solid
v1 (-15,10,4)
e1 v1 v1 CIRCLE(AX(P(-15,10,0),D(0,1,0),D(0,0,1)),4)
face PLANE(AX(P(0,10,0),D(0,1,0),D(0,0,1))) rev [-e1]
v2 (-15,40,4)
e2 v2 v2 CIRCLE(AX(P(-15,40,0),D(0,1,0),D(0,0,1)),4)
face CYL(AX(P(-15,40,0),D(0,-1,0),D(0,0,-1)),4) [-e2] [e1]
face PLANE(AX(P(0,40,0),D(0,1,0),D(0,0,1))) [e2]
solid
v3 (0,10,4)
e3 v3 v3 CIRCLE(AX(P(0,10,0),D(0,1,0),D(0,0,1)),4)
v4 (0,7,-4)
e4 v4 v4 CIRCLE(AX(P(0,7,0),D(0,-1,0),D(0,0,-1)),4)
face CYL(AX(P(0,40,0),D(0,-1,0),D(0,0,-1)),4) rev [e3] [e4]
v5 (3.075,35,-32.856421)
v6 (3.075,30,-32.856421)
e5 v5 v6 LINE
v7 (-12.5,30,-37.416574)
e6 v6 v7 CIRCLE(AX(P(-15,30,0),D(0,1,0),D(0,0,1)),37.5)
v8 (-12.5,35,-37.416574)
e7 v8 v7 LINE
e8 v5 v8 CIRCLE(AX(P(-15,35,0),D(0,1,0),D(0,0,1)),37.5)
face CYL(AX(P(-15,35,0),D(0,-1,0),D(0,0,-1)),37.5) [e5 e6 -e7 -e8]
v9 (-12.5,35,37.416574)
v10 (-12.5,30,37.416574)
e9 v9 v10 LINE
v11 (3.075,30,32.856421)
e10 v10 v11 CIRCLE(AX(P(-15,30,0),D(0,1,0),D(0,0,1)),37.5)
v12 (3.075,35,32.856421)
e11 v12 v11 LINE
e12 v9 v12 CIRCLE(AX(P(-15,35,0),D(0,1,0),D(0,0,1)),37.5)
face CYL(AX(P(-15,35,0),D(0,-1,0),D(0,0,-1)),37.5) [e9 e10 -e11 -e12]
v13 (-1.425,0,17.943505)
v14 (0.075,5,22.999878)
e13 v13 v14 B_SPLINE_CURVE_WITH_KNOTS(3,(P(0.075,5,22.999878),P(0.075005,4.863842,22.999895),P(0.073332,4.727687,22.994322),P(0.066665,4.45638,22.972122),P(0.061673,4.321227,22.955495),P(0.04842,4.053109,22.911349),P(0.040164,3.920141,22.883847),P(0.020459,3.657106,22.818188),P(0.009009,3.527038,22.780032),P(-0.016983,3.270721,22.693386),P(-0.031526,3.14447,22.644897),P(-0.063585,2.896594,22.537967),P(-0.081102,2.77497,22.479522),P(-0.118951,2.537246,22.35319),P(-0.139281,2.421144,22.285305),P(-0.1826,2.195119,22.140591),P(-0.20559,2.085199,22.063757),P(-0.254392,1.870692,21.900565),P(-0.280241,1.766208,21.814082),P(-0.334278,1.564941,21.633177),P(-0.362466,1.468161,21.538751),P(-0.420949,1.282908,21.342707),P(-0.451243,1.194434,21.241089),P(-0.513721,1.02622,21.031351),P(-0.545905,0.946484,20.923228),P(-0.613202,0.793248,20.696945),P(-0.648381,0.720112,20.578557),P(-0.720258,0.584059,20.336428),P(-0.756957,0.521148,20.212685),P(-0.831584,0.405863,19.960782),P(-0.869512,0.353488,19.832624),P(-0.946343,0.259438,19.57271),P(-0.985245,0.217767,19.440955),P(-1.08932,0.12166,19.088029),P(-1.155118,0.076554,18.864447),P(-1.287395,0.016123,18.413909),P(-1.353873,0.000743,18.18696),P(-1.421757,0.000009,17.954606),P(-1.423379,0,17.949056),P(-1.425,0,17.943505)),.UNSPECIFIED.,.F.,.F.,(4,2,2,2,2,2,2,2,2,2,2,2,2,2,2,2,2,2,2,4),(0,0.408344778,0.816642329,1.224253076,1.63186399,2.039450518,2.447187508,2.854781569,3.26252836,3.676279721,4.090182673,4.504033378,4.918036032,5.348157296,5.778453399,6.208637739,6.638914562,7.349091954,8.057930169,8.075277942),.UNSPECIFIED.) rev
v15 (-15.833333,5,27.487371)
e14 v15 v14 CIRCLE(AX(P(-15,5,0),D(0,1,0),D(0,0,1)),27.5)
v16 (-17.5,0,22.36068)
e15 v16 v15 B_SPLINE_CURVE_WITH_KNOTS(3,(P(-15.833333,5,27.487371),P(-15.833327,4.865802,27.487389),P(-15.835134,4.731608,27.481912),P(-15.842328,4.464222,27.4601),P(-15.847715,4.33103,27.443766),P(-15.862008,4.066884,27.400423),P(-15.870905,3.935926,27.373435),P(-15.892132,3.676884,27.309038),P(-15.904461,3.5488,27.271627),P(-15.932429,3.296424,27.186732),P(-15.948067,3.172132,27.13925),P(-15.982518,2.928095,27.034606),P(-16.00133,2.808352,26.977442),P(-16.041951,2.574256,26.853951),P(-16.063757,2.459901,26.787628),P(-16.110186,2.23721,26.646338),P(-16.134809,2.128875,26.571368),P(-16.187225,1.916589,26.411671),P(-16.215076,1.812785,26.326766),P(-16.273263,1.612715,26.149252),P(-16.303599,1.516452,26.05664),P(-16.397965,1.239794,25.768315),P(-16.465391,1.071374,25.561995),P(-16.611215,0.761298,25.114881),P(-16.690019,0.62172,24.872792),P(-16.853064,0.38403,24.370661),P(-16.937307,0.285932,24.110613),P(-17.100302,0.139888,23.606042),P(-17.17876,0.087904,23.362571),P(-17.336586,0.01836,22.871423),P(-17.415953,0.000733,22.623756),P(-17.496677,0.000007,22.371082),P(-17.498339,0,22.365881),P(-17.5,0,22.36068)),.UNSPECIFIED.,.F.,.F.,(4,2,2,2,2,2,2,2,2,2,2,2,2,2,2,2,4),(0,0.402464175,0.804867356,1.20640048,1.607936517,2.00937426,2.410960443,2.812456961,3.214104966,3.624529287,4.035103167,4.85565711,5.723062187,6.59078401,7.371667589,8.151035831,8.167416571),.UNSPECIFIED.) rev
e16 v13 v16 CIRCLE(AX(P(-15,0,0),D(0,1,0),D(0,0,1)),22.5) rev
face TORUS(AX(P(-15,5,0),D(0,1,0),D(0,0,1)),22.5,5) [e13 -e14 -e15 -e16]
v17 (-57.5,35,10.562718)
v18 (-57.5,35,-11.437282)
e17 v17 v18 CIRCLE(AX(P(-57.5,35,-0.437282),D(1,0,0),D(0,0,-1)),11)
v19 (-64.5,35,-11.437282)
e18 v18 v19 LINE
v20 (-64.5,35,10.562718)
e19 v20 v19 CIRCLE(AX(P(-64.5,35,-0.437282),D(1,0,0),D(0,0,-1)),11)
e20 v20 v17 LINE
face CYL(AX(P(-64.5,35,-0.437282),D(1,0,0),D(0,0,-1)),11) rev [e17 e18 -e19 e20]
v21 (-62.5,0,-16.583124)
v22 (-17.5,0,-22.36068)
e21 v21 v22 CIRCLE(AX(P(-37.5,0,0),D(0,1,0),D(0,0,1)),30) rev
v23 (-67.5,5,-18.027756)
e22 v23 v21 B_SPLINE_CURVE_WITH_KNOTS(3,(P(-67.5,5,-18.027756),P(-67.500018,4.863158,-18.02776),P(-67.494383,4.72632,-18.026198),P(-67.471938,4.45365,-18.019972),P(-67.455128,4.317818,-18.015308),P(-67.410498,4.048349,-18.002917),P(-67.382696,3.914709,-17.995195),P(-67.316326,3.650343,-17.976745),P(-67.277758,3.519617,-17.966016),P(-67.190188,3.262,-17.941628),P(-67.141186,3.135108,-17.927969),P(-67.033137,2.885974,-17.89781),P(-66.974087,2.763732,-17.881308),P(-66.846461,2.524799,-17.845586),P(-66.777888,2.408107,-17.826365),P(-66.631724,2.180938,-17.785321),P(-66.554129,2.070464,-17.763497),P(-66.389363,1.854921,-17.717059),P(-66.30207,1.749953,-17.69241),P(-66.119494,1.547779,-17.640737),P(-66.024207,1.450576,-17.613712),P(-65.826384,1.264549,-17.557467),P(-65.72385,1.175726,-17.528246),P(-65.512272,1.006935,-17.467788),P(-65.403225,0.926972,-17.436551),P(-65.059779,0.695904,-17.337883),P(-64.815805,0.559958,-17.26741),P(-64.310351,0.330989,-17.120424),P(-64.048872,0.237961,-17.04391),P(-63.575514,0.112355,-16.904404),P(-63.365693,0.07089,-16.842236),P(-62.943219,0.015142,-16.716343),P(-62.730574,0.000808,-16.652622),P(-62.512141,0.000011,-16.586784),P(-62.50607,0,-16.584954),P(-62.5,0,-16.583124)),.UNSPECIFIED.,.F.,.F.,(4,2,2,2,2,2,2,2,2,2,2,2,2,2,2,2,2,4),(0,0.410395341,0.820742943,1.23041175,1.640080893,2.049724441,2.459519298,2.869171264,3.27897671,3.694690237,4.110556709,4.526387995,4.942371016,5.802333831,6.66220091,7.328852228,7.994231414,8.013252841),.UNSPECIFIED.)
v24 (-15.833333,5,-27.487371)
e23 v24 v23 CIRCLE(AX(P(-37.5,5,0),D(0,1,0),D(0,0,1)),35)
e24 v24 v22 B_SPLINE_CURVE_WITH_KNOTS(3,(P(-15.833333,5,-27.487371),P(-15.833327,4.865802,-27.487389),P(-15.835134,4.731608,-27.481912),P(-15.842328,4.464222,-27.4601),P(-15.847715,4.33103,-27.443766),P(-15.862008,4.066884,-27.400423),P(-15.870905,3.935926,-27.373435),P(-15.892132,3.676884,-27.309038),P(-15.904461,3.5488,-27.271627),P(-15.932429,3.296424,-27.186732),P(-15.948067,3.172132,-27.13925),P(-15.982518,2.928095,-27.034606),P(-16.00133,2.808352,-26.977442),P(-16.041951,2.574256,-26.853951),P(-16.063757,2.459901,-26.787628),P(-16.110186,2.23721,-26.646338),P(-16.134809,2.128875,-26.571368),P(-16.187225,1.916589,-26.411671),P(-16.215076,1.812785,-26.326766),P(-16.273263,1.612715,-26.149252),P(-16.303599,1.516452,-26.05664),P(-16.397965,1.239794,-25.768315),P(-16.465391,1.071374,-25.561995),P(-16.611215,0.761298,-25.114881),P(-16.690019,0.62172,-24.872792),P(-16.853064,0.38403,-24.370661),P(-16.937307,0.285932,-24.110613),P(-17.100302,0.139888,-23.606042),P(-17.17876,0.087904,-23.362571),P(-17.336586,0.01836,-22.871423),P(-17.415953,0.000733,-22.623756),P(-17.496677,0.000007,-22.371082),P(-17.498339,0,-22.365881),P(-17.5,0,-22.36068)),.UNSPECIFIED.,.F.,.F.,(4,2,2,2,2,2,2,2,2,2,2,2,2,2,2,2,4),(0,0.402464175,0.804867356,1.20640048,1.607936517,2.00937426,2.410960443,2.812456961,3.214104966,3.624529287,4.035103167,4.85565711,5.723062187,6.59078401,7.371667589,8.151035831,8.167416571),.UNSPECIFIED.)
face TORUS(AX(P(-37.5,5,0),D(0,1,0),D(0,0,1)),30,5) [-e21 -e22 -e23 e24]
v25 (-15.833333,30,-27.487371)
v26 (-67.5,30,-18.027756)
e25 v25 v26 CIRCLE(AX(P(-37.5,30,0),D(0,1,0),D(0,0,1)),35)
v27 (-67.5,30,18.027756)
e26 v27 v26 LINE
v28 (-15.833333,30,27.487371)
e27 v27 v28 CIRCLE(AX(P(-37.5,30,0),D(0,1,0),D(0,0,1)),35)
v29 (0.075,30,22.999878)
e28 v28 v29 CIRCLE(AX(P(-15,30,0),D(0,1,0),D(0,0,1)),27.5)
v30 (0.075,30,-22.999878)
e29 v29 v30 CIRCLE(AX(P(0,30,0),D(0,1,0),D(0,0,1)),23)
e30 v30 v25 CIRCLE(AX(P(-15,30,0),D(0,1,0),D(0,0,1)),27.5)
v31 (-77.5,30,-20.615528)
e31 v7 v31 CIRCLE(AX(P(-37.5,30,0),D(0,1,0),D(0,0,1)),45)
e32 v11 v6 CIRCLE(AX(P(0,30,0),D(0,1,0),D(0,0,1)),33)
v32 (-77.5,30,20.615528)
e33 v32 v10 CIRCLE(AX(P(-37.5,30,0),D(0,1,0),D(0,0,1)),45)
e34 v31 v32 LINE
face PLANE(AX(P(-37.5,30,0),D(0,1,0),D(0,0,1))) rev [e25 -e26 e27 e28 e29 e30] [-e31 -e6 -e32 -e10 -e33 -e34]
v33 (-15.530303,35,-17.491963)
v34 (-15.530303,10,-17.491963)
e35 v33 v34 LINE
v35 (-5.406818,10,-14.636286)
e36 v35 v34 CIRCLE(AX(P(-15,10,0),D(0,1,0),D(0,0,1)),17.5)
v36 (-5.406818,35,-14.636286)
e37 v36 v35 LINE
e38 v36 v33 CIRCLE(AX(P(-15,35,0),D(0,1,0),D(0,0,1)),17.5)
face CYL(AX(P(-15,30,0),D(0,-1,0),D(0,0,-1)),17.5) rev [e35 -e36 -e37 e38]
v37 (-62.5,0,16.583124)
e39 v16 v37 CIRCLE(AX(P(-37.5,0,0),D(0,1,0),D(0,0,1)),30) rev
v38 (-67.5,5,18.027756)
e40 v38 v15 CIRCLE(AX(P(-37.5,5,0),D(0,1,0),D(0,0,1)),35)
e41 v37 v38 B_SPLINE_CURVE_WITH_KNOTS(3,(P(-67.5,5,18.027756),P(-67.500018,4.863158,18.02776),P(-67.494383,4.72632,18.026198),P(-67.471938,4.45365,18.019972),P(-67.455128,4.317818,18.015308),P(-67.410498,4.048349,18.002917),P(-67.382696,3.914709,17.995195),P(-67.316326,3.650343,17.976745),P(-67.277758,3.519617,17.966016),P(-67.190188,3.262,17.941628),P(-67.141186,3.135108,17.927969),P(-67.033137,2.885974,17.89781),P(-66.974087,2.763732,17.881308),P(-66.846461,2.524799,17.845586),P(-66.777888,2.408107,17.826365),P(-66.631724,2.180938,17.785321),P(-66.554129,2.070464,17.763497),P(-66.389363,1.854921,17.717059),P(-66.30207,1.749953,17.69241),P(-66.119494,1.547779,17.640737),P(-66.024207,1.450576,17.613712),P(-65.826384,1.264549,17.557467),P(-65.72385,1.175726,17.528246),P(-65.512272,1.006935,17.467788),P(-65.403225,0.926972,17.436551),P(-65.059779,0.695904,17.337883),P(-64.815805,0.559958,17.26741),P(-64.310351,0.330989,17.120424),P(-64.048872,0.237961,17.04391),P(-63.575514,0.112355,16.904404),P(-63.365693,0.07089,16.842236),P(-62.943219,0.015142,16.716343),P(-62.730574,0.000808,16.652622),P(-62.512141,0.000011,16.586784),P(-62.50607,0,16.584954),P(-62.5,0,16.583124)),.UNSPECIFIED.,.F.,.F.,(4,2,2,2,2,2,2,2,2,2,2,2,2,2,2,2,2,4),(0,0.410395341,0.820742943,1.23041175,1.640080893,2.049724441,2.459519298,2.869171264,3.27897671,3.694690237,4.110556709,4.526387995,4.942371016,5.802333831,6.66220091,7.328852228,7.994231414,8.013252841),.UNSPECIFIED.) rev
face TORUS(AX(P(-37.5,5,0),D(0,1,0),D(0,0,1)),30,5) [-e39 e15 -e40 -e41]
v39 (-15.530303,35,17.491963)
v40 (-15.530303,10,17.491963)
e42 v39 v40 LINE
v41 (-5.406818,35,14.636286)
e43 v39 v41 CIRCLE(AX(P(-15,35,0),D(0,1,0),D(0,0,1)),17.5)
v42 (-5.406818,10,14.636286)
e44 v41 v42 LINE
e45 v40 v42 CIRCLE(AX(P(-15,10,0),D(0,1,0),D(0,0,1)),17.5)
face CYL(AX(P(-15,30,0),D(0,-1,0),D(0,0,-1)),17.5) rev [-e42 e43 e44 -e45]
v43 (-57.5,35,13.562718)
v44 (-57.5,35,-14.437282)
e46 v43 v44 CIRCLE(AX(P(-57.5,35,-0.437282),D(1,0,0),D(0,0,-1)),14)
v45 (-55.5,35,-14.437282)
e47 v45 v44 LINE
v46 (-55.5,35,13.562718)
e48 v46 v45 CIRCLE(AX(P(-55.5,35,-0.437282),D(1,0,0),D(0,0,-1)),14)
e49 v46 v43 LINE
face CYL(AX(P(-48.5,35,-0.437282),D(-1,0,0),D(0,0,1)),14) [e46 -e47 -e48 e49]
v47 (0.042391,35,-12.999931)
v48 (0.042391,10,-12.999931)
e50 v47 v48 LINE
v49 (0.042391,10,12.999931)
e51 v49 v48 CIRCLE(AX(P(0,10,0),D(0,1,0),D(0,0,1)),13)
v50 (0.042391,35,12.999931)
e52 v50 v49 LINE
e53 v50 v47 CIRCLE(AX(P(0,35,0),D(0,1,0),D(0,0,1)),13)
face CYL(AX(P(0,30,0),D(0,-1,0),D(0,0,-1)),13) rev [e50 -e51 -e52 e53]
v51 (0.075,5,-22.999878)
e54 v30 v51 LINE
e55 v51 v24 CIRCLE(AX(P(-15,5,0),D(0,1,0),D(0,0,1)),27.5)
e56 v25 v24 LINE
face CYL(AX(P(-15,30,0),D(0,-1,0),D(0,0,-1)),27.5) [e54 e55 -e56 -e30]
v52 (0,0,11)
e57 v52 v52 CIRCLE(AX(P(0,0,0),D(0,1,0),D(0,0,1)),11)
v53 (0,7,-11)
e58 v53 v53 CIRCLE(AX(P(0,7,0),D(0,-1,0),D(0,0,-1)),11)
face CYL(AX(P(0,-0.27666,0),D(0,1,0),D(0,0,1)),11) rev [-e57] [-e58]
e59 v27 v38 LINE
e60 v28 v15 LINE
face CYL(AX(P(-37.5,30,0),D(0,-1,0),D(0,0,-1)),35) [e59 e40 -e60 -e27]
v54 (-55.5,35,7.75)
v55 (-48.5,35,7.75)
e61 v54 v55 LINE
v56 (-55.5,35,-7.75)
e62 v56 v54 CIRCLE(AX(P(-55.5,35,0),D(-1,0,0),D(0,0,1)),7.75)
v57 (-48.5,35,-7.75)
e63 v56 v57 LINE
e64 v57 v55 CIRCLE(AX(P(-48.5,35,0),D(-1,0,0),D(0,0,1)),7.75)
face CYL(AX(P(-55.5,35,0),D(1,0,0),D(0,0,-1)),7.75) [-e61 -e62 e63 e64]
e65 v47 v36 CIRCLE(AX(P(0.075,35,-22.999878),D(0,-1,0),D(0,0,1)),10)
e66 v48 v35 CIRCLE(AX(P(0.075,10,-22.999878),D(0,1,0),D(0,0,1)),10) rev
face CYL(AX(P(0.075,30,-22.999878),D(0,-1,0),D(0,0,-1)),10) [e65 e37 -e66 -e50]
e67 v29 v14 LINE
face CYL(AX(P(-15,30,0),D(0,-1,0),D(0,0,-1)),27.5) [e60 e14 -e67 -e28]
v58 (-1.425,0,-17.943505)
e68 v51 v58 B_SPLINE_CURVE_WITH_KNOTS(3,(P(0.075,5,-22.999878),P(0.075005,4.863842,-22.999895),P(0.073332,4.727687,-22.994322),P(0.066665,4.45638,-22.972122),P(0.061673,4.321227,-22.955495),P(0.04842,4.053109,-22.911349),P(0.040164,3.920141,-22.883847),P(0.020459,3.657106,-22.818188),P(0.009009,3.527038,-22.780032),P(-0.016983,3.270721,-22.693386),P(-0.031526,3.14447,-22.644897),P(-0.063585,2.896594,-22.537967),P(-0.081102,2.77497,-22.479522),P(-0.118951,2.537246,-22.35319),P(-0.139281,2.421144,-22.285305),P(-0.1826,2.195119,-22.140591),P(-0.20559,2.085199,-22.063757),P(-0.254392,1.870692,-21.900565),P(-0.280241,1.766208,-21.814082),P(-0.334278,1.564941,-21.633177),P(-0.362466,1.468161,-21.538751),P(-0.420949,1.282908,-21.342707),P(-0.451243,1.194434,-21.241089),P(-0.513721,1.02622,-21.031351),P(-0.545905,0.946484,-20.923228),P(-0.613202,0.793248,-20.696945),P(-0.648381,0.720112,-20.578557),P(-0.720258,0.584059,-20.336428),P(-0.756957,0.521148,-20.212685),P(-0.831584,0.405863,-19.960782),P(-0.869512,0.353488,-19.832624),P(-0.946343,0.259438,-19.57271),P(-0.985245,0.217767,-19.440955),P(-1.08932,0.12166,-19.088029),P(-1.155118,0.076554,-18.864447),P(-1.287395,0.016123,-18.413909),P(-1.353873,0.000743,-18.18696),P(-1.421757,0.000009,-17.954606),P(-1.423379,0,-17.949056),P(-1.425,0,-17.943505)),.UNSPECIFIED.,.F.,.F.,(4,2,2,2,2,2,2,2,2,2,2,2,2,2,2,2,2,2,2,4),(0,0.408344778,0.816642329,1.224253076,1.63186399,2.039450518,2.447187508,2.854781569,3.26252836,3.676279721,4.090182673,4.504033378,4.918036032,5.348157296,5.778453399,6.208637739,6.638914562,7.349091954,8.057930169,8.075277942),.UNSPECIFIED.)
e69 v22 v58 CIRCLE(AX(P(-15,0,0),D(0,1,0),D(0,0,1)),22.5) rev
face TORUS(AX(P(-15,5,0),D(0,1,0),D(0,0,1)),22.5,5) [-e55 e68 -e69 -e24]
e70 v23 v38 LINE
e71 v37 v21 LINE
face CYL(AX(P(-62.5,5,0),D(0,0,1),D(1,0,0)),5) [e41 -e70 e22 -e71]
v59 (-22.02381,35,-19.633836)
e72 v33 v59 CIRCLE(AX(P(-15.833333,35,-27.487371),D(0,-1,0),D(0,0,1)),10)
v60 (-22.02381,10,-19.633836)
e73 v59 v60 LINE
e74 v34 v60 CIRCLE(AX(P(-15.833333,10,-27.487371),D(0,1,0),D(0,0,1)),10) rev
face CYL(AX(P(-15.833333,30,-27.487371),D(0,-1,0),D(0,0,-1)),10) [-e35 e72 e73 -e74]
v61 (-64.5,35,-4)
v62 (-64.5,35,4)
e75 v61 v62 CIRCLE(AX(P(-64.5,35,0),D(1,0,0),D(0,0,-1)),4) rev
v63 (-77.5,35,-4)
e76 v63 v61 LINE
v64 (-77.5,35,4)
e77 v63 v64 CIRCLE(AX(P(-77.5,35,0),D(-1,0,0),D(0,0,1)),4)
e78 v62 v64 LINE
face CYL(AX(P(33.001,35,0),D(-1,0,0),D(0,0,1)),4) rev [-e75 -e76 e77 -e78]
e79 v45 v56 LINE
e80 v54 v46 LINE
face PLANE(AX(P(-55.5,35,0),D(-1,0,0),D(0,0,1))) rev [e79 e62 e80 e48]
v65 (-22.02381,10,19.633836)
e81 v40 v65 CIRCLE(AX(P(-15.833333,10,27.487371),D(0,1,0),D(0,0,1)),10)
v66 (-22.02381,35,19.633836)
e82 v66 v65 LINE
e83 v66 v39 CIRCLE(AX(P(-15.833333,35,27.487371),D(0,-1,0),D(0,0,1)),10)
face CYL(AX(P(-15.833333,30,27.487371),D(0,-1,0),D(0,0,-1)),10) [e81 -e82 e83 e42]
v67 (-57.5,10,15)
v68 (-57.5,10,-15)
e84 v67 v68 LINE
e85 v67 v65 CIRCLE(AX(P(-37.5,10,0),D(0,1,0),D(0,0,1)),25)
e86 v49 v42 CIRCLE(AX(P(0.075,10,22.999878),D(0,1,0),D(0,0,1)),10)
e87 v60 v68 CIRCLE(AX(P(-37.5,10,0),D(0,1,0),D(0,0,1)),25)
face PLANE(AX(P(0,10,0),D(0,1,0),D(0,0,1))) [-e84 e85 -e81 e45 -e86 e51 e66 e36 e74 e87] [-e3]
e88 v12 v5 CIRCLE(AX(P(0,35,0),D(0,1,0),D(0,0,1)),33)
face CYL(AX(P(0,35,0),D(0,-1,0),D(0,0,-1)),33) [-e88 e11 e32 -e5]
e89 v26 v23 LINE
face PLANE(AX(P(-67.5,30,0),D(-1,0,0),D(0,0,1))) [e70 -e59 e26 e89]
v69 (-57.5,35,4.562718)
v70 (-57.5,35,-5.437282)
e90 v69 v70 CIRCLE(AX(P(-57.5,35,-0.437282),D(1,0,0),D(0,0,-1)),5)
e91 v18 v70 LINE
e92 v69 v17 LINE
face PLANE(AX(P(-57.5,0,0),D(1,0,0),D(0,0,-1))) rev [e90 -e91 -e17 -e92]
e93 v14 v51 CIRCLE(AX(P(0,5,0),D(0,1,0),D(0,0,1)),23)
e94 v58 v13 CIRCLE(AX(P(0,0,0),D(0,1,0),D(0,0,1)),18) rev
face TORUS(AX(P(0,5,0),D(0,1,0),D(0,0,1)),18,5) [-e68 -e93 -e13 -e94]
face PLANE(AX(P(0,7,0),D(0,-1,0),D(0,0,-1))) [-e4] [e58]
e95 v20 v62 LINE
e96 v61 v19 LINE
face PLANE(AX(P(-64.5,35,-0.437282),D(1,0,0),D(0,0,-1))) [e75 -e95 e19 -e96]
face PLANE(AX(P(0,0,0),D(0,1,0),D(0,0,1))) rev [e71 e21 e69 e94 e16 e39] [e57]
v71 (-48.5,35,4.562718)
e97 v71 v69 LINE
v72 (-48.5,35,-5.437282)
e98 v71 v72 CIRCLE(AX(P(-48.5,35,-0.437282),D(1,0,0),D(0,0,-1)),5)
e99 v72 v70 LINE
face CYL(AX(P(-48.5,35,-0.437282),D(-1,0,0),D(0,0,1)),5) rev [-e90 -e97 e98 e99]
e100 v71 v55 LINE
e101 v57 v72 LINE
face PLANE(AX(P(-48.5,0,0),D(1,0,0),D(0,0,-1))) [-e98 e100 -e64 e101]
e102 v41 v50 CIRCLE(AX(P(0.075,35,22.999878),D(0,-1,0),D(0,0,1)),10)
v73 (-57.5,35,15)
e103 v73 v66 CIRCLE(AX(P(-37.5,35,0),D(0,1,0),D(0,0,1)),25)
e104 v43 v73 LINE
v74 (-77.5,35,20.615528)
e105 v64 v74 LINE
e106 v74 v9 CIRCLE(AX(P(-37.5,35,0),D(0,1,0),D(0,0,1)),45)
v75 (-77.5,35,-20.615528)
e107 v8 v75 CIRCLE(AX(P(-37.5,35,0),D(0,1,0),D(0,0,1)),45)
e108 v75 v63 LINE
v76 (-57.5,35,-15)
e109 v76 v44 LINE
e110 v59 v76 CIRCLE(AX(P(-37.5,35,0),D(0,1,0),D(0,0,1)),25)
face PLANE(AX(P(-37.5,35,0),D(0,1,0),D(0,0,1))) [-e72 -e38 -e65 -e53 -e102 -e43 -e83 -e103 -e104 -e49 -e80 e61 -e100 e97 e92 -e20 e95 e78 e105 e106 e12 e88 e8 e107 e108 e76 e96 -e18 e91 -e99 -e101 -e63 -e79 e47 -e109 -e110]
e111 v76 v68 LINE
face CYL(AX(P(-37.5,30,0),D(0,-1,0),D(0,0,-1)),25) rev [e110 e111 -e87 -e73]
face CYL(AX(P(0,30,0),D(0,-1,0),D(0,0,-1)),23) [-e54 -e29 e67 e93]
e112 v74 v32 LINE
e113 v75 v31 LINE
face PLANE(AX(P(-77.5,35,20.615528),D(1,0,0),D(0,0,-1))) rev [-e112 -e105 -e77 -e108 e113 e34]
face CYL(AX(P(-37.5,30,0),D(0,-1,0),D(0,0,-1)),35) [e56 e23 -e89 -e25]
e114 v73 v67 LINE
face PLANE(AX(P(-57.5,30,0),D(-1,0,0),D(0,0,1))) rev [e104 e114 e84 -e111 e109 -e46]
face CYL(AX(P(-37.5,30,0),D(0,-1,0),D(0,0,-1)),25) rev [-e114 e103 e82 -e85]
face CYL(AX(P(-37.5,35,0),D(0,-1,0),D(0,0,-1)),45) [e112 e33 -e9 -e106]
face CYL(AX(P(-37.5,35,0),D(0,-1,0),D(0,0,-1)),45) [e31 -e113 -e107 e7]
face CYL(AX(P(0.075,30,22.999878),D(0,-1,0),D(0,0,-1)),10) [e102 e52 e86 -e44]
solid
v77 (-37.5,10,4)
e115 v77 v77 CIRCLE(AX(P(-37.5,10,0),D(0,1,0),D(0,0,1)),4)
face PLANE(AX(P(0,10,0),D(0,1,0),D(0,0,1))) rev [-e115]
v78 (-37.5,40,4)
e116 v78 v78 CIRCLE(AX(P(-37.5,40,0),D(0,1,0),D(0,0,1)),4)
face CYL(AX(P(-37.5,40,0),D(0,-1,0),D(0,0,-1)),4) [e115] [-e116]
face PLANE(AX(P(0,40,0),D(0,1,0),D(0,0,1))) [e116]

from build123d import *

# Parameters (mm, degrees)
SKETCH1_R             = 4
SKETCH1_R_2           = 11
BOSS_EXTRUDE1_DEPTH   = 10
BOSS_EXTRUDE2_DEPTH   = 30
BOSS_EXTRUDE3_DEPTH   = 5
SKETCH6_R             = 11
CUT_EXTRUDE2_DEPTH    = 7
CUT_EXTRUDE3_REACH    = 126.339
SKETCH3_R             = 4
FILLET1_R             = 5
BOSS_EXTRUDE4_START   = 10
SKETCH1_4_R           = 4
BOSS_EXTRUDE4_DEPTH   = 30
BOSS_EXTRUDE4_2_DEPTH = 30
CUT_EXTRUDE5_START    = 3
SKETCH7_R             = 11
CUT_EXTRUDE5_DEPTH    = 7
SKETCH8_R             = 4
CUT_EXTRUDE6_DEPTH    = 96.5
BOSS_EXTRUDE8_START   = 9
BOSS_EXTRUDE8_DEPTH   = 9
CUT_EXTRUDE7_DEPTH    = 7


with BuildPart() as part:
    # Sketch1 → Boss-Extrude1 (new body)
    # profile 1 of 4: a face of its own
    with BuildSketch(Plane(origin=(0, 0, 0), x_dir=(1, 0, 0), z_dir=(0, 1, 0))):
        with BuildLine():
            ThreePointArc((-15.53030303, -17.49196326), (-18.965809959, -17.990656132), (-22.023809524, -19.633836312))
            ThreePointArc((-22.023809524, -19.633836312), (-40.737950416, -24.78942672), (-57.5, -15))
            Line((-57.5, -15), (-57.5, 15))
            ThreePointArc((-57.5, 15), (-40.737950416, 24.78942672), (-22.023809524, 19.633836312))
            ThreePointArc((-22.023809524, 19.633836312), (-18.965809959, 17.990656132), (-15.53030303, 17.49196326))
            ThreePointArc((-15.53030303, 17.49196326), (-10.248929974, 16.842723462), (-5.406818182, 14.63628582))
            ThreePointArc((-5.406818182, 14.63628582), (-2.801045952, 13.422385369), (0.042391304, 12.999930884))
            ThreePointArc((0.042391304, 12.999930884), (13, 0), (0.042391304, -12.999930884))
            ThreePointArc((0.042391304, -12.999930884), (-2.801045952, -13.422385369), (-5.406818182, -14.63628582))
            ThreePointArc((-5.406818182, -14.63628582), (-10.248929974, -16.842723462), (-15.53030303, -17.49196326))
        make_face()
        with Locations((-37.5, 0)):
            Circle(SKETCH1_R, mode=Mode.SUBTRACT)
        Circle(SKETCH1_R_2, mode=Mode.SUBTRACT)
        with Locations((-15, 0)):
            Circle(SKETCH1_R, mode=Mode.SUBTRACT)
    # profile 2 of 4: a face of its own
    with BuildSketch(Plane(origin=(0, 0, 0), x_dir=(1, 0, 0), z_dir=(0, 1, 0))):
        with Locations((-37.5, 0)):
            Circle(SKETCH1_R)
    # profile 3 of 4: a face of its own
    with BuildSketch(Plane(origin=(0, 0, 0), x_dir=(1, 0, 0), z_dir=(0, 1, 0))):
        with Locations((-15, 0)):
            Circle(SKETCH1_R)
    # profile 4 of 4: a face of its own
    with BuildSketch(Plane(origin=(0, 0, 0), x_dir=(1, 0, 0), z_dir=(0, 1, 0))):
        Circle(SKETCH1_R_2)
    extrude(amount=BOSS_EXTRUDE1_DEPTH)

    # Sketch1<3> → Boss-Extrude2 (add)
    with BuildSketch(Plane(origin=(0, 0, 0), x_dir=(1, 0, 0), z_dir=(0, 1, 0))):
        with BuildLine():
            Line((-67.5, -18.027756377), (-67.5, 18.027756377))
            ThreePointArc((-67.5, 18.027756377), (-43.803347329, 34.427718665), (-15.833333333, 27.487370837))
            ThreePointArc((-15.833333333, 27.487370837), (-7.534032816, 26.467136868), (0.075, 22.999877717))
            ThreePointArc((0.075, 22.999877717), (23, 0), (0.075, -22.999877717))
            ThreePointArc((0.075, -22.999877717), (-7.534032816, -26.467136868), (-15.833333333, -27.487370837))
            ThreePointArc((-15.833333333, -27.487370837), (-43.803347329, -34.427718665), (-67.5, -18.027756377))
        make_face()
        with BuildLine():
            Line((-57.5, -15), (-57.5, 15))
            ThreePointArc((-57.5, 15), (-40.737950416, 24.78942672), (-22.023809524, 19.633836312))
            ThreePointArc((-22.023809524, 19.633836312), (-18.965809959, 17.990656132), (-15.53030303, 17.49196326))
            ThreePointArc((-15.53030303, 17.49196326), (-10.248929974, 16.842723462), (-5.406818182, 14.63628582))
            ThreePointArc((-5.406818182, 14.63628582), (-2.801045952, 13.422385369), (0.042391304, 12.999930884))
            ThreePointArc((0.042391304, 12.999930884), (13, 0), (0.042391304, -12.999930884))
            ThreePointArc((0.042391304, -12.999930884), (-2.801045952, -13.422385369), (-5.406818182, -14.63628582))
            ThreePointArc((-5.406818182, -14.63628582), (-10.248929974, -16.842723462), (-15.53030303, -17.49196326))
            ThreePointArc((-15.53030303, -17.49196326), (-18.965809959, -17.990656132), (-22.023809524, -19.633836312))
            ThreePointArc((-22.023809524, -19.633836312), (-40.737950416, -24.78942672), (-57.5, -15))
        make_face(mode=Mode.SUBTRACT)
    extrude(amount=BOSS_EXTRUDE2_DEPTH)

    # Sketch2 → Boss-Extrude3 (add)
    with BuildSketch(Plane(origin=(0, 30, 0), x_dir=(1, 0, 0), z_dir=(0, 1, 0))):
        with BuildLine():
            Line((-77.5, -20.615528128), (-77.5, 20.615528128))
            ThreePointArc((-77.5, 20.615528128), (-48.761384661, 43.568121551), (-12.5, 37.416573868))
            ThreePointArc((-12.5, 37.416573868), (-4.462855904, 35.989145507), (3.075, 32.856420605))
            ThreePointArc((3.075, 32.856420605), (33, 0), (3.075, -32.856420605))
            ThreePointArc((3.075, -32.856420605), (-4.462855904, -35.989145507), (-12.5, -37.416573868))
            ThreePointArc((-12.5, -37.416573868), (-48.761384661, -43.568121551), (-77.5, -20.615528128))
        make_face()
        with BuildLine():
            Line((-57.5, -15), (-57.5, 15))
            ThreePointArc((-57.5, 15), (-40.737950416, 24.78942672), (-22.023809524, 19.633836312))
            ThreePointArc((-22.023809524, 19.633836312), (-18.965809959, 17.990656132), (-15.53030303, 17.49196326))
            ThreePointArc((-15.53030303, 17.49196326), (-10.248929974, 16.842723462), (-5.406818182, 14.63628582))
            ThreePointArc((-5.406818182, 14.63628582), (-2.801045952, 13.422385369), (0.042391304, 12.999930884))
            ThreePointArc((0.042391304, 12.999930884), (13, 0), (0.042391304, -12.999930884))
            ThreePointArc((0.042391304, -12.999930884), (-2.801045952, -13.422385369), (-5.406818182, -14.63628582))
            ThreePointArc((-5.406818182, -14.63628582), (-10.248929974, -16.842723462), (-15.53030303, -17.49196326))
            ThreePointArc((-15.53030303, -17.49196326), (-18.965809959, -17.990656132), (-22.023809524, -19.633836312))
            ThreePointArc((-22.023809524, -19.633836312), (-40.737950416, -24.78942672), (-57.5, -15))
        make_face(mode=Mode.SUBTRACT)
    extrude(amount=BOSS_EXTRUDE3_DEPTH)

    # Sketch6 → Cut-Extrude2 (cut)
    with BuildSketch(Plane(origin=(-57.5, 0, 0), x_dir=(0, 0, -1), z_dir=(1, 0, 0))):
        with Locations((0.437281594, 35)):
            Circle(SKETCH6_R)
    extrude(amount=-CUT_EXTRUDE2_DEPTH, mode=Mode.SUBTRACT)

    # Sketch3 → Cut-Extrude3 (cut, up to next)
    with BuildSketch(Plane.ZY.offset(77.5), mode=Mode.PRIVATE) as cut_extrude3_sk1:
        with Locations((0, 35)):
            Circle(SKETCH3_R)
    cut_extrude3_tool1 = extrude(cut_extrude3_sk1.sketch, amount=-CUT_EXTRUDE3_REACH, mode=Mode.PRIVATE) & part.part
    add(cut_extrude3_tool1.solids().sort_by_distance((-77.5, 35, 0))[0], mode=Mode.SUBTRACT)

    # Fillet1
    fillet1_edges = [part.edges().sort_by_distance(p)[0] for p in [
        (-43.803347329, 0, 34.427718665),
        (-7.534032816, 0, 26.467136868),
        (23, 0, 0),
        (-7.534032816, 0, -26.467136868),
        (-43.803347329, 0, -34.427718665),
        (-67.5, 0, 0),
    ]]
    fillet(fillet1_edges, radius=FILLET1_R - 0.0001)  # a hair under: the kernel refuses the full size

    # Sketch7 → Cut-Extrude5 (cut)
    with BuildSketch(Plane.XZ.offset(-10).offset(CUT_EXTRUDE5_START)):
        with Locations(Location((0, 0, 0), (0, 0, 90))):
            Circle(SKETCH7_R)
    extrude(amount=CUT_EXTRUDE5_DEPTH, mode=Mode.SUBTRACT)

    # Sketch8 → Cut-Extrude6 (cut, through all)
    with BuildSketch(Plane.XZ.offset(-7)):
        with Locations(Location((0, 0, 0), (0, 0, 270))):
            Circle(SKETCH8_R)
    extrude(amount=-CUT_EXTRUDE6_DEPTH, mode=Mode.SUBTRACT)

    # Sketch9 → Boss-Extrude8 (add)
    with BuildSketch(Plane(origin=(-57.5, 0, 0), x_dir=(0, 0, -1), z_dir=(1, 0, 0)).offset(BOSS_EXTRUDE8_START)):
        with BuildLine():
            ThreePointArc((-4.562718406, 35), (0.437281594, 30), (5.437281594, 35))
            Line((5.437281594, 35), (11.437281594, 35))
            ThreePointArc((11.437281594, 35), (0.437281594, 24), (-10.562718406, 35))
            Line((-10.562718406, 35), (-4.562718406, 35))
        make_face()
        with BuildLine():
            Line((-10.562718406, 35), (-13.562718406, 35))
            ThreePointArc((-13.562718406, 35), (0.437281594, 21), (14.437281594, 35))
            Line((14.437281594, 35), (11.437281594, 35))
            ThreePointArc((11.437281594, 35), (0.437281594, 24), (-10.562718406, 35))
        make_face()
    extrude(amount=-BOSS_EXTRUDE8_DEPTH)

    # Sketch11 → Cut-Extrude7 (cut)
    with BuildSketch(Plane(origin=(-48.5, 0, 0), x_dir=(0, 0, -1), z_dir=(1, 0, 0))):
        with BuildLine():
            Line((-13.562718406, 35), (-7.75, 35))
            ThreePointArc((-7.75, 35), (0, 27.25), (7.75, 35))
            Line((7.75, 35), (14.437281594, 35))
            ThreePointArc((14.437281594, 35), (0.437281594, 21), (-13.562718406, 35))
        make_face()
    extrude(amount=-CUT_EXTRUDE7_DEPTH, mode=Mode.SUBTRACT)


with BuildPart() as body_2:
    # Sketch1<4> → Boss-Extrude4 (new body)
    with BuildSketch(Plane(origin=(0, 0, 0), x_dir=(1, 0, 0), z_dir=(0, 1, 0)).offset(BOSS_EXTRUDE4_START)):
        with Locations(Location((-37.5, 0, 0), (0, 0, 270))):
            Circle(SKETCH1_4_R)
    extrude(amount=BOSS_EXTRUDE4_DEPTH)


with BuildPart() as body_3:
    # Sketch1<4> → Boss-Extrude4 2 (new body)
    with BuildSketch(Plane(origin=(0, 0, 0), x_dir=(1, 0, 0), z_dir=(0, 1, 0)).offset(BOSS_EXTRUDE4_START)):
        with Locations(Location((-15, 0, 0), (0, 0, 270))):
            Circle(SKETCH1_4_R)
    extrude(amount=BOSS_EXTRUDE4_2_DEPTH)


solid = Compound([part.part, body_2.part, body_3.part])
